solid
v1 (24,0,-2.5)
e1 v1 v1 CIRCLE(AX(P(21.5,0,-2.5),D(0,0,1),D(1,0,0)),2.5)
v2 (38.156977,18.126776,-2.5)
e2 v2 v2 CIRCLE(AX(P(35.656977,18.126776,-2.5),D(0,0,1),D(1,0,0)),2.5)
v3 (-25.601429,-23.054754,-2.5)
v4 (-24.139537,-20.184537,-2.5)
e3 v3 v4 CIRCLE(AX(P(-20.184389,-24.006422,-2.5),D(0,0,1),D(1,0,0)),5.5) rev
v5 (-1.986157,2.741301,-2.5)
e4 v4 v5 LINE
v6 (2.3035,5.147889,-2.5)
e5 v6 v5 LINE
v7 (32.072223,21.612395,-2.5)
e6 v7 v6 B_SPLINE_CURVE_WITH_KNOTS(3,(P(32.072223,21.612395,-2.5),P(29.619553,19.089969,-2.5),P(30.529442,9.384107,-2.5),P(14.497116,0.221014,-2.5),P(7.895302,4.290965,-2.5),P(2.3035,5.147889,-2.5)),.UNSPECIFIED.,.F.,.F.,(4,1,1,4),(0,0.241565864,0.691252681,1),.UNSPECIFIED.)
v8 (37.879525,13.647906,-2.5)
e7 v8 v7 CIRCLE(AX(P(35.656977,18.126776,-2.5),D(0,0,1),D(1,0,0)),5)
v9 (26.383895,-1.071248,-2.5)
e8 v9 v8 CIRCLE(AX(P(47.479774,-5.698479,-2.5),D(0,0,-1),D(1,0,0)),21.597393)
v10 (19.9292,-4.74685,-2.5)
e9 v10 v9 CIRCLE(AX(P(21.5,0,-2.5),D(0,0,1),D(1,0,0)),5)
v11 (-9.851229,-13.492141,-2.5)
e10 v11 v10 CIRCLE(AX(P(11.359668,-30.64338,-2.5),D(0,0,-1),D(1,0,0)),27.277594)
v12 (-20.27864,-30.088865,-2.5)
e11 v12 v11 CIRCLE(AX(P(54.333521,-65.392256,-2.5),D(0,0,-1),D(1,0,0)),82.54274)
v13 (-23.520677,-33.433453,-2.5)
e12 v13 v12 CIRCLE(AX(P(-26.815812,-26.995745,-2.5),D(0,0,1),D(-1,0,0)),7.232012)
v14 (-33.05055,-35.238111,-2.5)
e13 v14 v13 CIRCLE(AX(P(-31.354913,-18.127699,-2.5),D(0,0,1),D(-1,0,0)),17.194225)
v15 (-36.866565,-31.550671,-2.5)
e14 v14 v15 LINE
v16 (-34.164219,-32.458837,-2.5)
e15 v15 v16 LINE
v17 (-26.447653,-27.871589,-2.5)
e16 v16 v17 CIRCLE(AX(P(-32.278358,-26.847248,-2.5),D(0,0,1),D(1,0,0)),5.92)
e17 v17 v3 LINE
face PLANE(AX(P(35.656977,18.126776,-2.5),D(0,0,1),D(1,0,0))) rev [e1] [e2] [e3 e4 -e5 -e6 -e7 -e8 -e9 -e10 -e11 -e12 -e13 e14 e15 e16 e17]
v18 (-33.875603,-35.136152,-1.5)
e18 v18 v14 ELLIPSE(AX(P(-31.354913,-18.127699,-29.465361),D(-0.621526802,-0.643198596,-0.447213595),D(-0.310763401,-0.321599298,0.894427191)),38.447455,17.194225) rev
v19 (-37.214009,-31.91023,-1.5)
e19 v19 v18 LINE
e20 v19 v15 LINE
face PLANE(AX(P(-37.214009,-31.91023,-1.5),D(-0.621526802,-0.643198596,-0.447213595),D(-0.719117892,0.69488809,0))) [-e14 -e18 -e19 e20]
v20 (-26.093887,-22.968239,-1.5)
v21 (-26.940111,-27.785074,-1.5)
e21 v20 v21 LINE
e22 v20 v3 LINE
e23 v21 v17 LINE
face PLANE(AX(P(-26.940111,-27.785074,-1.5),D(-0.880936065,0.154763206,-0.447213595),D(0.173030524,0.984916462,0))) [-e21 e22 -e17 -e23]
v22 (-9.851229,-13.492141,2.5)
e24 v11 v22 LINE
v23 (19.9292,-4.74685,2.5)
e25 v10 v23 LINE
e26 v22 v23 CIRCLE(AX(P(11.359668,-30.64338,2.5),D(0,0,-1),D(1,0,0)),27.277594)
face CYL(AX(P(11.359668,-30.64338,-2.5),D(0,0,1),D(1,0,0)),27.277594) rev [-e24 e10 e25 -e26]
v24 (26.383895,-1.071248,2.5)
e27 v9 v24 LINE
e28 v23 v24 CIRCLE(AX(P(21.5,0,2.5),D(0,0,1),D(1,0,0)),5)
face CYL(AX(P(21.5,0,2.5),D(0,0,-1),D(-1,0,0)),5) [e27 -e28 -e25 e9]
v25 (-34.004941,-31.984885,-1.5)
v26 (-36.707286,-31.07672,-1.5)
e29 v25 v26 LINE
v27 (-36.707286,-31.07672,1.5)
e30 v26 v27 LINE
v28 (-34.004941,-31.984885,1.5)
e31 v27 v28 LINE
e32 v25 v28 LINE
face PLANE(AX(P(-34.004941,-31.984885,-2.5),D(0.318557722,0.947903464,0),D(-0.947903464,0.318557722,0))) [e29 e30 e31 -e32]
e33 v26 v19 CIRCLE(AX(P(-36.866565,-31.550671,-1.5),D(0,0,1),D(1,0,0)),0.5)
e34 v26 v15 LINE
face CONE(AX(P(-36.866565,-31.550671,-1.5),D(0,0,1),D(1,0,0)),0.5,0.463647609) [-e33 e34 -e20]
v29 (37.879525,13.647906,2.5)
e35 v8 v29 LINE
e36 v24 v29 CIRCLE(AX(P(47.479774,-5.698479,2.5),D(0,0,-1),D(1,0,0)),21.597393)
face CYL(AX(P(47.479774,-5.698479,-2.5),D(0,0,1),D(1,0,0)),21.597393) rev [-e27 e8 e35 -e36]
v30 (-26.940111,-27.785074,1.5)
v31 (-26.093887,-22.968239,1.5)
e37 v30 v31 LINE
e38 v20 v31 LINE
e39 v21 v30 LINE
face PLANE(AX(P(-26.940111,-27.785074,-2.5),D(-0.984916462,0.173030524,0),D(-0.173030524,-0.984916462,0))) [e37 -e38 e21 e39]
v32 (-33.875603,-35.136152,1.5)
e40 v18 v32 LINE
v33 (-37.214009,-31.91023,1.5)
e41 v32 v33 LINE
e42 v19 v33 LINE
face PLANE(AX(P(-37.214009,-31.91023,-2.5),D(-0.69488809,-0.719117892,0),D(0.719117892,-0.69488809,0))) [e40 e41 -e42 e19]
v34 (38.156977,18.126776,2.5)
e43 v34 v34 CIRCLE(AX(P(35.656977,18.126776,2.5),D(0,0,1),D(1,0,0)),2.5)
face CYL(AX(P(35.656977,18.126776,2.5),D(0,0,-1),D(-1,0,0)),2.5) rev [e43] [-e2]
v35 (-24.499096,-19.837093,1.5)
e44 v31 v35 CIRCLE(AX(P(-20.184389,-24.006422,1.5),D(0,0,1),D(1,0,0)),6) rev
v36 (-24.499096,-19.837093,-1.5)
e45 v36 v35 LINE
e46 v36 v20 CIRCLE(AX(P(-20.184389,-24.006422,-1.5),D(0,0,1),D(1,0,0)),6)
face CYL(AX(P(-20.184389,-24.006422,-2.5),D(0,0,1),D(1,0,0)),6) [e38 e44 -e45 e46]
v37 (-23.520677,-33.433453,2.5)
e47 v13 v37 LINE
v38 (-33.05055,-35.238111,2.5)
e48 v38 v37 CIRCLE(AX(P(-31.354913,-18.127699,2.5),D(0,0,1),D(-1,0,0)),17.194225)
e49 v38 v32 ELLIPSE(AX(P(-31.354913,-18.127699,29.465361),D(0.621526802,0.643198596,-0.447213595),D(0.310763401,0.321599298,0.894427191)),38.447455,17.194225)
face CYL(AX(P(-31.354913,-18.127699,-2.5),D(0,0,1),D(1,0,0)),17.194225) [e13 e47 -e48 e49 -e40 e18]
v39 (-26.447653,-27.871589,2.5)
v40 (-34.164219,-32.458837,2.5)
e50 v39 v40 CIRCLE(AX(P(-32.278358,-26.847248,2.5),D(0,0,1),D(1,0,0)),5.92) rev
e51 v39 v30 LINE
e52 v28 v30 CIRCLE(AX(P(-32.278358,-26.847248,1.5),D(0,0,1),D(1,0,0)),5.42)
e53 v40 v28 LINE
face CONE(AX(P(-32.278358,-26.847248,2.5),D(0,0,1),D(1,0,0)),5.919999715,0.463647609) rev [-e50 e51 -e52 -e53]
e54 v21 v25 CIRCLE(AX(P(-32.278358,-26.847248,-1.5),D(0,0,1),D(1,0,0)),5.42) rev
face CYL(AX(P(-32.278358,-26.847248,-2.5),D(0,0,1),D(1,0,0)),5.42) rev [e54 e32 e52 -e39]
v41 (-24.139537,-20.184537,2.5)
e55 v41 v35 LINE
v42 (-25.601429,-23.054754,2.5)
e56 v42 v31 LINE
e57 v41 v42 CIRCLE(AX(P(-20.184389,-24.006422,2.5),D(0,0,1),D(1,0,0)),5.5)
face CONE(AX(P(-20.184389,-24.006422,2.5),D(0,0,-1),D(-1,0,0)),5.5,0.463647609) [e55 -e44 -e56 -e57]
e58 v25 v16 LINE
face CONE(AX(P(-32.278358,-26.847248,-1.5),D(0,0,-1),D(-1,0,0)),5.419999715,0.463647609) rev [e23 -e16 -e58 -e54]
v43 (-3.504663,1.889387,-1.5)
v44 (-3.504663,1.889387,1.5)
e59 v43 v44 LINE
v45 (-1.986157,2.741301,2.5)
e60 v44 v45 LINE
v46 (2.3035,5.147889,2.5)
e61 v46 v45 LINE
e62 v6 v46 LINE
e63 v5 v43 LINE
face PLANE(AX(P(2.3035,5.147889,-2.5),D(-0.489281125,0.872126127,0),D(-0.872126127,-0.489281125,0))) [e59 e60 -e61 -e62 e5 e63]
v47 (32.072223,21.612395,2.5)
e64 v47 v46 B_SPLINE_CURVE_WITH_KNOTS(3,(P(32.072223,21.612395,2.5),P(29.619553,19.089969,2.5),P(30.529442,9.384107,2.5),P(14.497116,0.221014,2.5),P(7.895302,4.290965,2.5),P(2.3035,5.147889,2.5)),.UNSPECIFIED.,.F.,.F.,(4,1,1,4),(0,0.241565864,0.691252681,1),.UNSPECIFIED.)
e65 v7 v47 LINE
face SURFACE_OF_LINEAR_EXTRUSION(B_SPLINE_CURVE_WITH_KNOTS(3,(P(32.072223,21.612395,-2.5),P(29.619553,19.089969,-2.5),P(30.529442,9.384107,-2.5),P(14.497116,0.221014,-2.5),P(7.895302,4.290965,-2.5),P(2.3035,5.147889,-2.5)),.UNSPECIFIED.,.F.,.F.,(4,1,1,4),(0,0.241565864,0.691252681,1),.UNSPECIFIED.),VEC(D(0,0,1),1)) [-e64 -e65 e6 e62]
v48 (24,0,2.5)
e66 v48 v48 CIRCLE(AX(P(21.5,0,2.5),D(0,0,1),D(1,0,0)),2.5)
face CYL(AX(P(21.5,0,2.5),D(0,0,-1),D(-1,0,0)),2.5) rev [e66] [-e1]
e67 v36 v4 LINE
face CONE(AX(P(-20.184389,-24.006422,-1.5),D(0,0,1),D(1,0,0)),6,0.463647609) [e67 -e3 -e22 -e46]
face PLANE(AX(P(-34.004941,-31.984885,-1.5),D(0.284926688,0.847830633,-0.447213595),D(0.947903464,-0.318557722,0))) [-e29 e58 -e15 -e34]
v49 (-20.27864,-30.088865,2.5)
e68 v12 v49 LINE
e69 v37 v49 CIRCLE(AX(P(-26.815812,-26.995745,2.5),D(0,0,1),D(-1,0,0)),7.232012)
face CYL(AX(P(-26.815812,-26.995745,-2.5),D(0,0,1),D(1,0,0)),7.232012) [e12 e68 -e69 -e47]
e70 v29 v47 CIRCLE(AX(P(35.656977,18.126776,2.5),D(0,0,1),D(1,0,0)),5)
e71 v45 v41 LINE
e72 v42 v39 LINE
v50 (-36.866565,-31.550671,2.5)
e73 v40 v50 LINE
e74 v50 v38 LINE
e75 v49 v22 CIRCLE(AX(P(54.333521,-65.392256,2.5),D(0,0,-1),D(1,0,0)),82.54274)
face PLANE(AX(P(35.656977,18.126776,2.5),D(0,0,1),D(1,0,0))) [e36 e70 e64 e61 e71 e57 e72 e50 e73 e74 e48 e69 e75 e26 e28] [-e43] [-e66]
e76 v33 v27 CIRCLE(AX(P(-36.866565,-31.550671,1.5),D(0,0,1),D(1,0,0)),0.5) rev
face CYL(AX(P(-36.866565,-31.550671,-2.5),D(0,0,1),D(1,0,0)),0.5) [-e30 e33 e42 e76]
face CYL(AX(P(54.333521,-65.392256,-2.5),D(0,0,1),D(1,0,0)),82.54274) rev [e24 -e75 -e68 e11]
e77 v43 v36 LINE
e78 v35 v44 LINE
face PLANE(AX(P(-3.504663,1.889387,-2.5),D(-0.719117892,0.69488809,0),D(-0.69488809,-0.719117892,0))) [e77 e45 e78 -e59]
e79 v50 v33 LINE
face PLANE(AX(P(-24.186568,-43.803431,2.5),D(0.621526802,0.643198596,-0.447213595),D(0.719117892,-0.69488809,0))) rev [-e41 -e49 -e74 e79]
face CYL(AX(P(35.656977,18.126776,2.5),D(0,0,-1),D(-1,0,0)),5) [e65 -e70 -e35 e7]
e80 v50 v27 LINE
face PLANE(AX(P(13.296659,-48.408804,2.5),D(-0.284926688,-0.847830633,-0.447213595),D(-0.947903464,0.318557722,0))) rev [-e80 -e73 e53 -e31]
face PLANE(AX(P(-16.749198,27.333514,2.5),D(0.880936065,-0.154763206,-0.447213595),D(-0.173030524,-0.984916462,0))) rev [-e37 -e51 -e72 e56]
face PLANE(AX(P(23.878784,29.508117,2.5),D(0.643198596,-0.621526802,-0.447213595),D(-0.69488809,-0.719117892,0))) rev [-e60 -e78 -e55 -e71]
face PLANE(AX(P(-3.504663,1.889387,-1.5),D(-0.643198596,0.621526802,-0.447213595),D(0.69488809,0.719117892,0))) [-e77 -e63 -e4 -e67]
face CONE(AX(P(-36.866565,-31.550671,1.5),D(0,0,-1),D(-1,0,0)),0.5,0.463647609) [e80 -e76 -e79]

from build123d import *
from OCP.BRepFilletAPI import BRepFilletAPI_MakeChamfer

# Parameters (mm, degrees)
SKETCH_1_R          = 2.5
EXTRUDE_1_DEPTH     = 2.5
SKETCH_2_OUTSIDE_W  = 116.118
SKETCH_2_OUTSIDE_H  = 88.955
CUT_EXTRUDE_1_DEPTH = 5
CHAMFER_1_SIZE      = 1
CHAMFER_1_SIZE_2    = 0.5
CHAMFER_2_SIZE      = 0.5
CHAMFER_2_SIZE_2    = 1


with BuildPart() as part:
    # 草圖1 → 填料-伸長1 (new, symmetric)
    with BuildSketch(Plane.XY):
        with BuildLine():
            Line((33.210571119, 22.487406669), (9.212656684, 9.024071248))
            Line((9.212656684, 9.024071248), (9.212656684, 13.217540535))
            Line((9.212656684, 13.217540535), (-51.018500429, 13.217540535))
            Line((-51.018500429, 13.217540535), (-51.018500429, -41.386180002))
            Line((-51.018500429, -41.386180002), (9.212656684, -41.386180002))
            Line((9.212656684, -41.386180002), (9.212656684, -5))
            Line((9.212656684, -5), (21.5, -5))
            ThreePointArc((21.5, -5), (23.692257033, -4.493774483), (25.440603486, -3.07760364))
            Line((25.440603486, -3.07760364), (39.59758023, 15.049172396))
            ThreePointArc((39.59758023, 15.049172396), (39.450390654, 21.384077206), (33.210571119, 22.487406669))
        make_face()
        with Locations((21.5, 0)):
            Circle(SKETCH_1_R, mode=Mode.SUBTRACT)
        with Locations((35.656976744, 18.126776036)):
            Circle(SKETCH_1_R, mode=Mode.SUBTRACT)
    extrude(amount=EXTRUDE_1_DEPTH, both=True)

    # 草圖2 outside → 除料-伸長1 (cut)
    with BuildSketch(Plane.XY.offset(2.5)):
        with Locations((-5.181, -9.1295)):
            Rectangle(SKETCH_2_OUTSIDE_W, SKETCH_2_OUTSIDE_H)
        with BuildLine():
            Line((-3.504662874, 1.889387135), (-24.499095951, -19.837093245))
            ThreePointArc((-24.499095951, -19.837093245), (-25.530846828, -21.28330144), (-26.093887373, -22.968238639))
            Line((-26.093887373, -22.968238639), (-26.940110928, -27.785073774))
            ThreePointArc((-26.940110928, -27.785073774), (-29.508767127, -31.506192899), (-34.004940633, -31.984884889))
            Line((-34.004940633, -31.984884889), (-36.707285896, -31.076719678))
            ThreePointArc((-36.707285896, -31.076719678), (-37.293807717, -31.290934133), (-37.214008802, -31.910230356))
            Line((-37.214008802, -31.910230356), (-33.875603228, -35.136152419))
            ThreePointArc((-33.875603228, -35.136152419), (-28.5650672, -35.094081272), (-23.520676583, -33.433453021))
            ThreePointArc((-23.520676583, -33.433453021), (-21.623015625, -32.029319154), (-20.278640263, -30.088864592))
            ThreePointArc((-20.278640263, -30.088864592), (-15.559314436, -21.479893225), (-9.851228903, -13.492141112))
            ThreePointArc((-9.851228903, -13.492141112), (3.673898096, -4.470950273), (19.929199503, -4.746850092))
            ThreePointArc((19.929199503, -4.746850092), (23.974199209, -4.344920975), (26.383894798, -1.071247685))
            ThreePointArc((26.383894798, -1.071247685), (30.458421446, 7.595163953), (37.879524863, 13.647905658))
            ThreePointArc((37.879524863, 13.647905658), (39.697047859, 21.072590929), (32.072223107, 21.612395258))
            add(Edge.make_bspline(
                [(32.072223107, 21.612395258), (29.619553058, 19.089968877), (30.529442098, 9.384107467), (14.497116464, 0.221014353), (7.895302384, 4.290965143), (2.303499892, 5.147888773)],
                knots=[0, 0, 0, 0, 0.241565864, 0.691252681, 1, 1, 1, 1], degree=3))
            Line((2.303499892, 5.147888773), (-3.504662874, 1.889387135))
        make_face(mode=Mode.SUBTRACT)
    extrude(amount=-CUT_EXTRUDE_1_DEPTH, mode=Mode.SUBTRACT)

    # 導角1
    chamfer_1_edges_1 = [part.edges().sort_by_distance(p)[0] for p in [
        (-35.544806015, -33.523191388, 2.5),
    ]]
    chamfer_1_side_1 = [part.faces().sort_by_distance(p)[0] for p in [
        (-35.544806015, -33.523191388, 2.49),
    ]]
    chamfer_1_edges_2 = [part.edges().sort_by_distance(p)[0] for p in [
        (-37.293807717, -31.290934133, 2.5),
    ]]
    chamfer_1_side_2 = [part.faces().sort_by_distance(p)[0] for p in [
        (-37.293807717, -31.290934133, 2.49),
    ]]
    chamfer_1_edges_3 = [part.edges().sort_by_distance(p)[0] for p in [
        (-35.356113265, -31.530802283, 2.5),
    ]]
    chamfer_1_side_3 = [part.faces().sort_by_distance(p)[0] for p in [
        (-35.356113265, -31.530802283, 2.49),
    ]]
    chamfer_1_edges_4 = [part.edges().sort_by_distance(p)[0] for p in [
        (-29.508767127, -31.506192899, 2.5),
    ]]
    chamfer_1_side_4 = [part.faces().sort_by_distance(p)[0] for p in [
        (-29.508767127, -31.506192899, 2.49),
    ]]
    chamfer_1_edges_5 = [part.edges().sort_by_distance(p)[0] for p in [
        (-26.516999151, -25.376656206, 2.5),
    ]]
    chamfer_1_side_5 = [part.faces().sort_by_distance(p)[0] for p in [
        (-26.516999151, -25.376656206, 2.49),
    ]]
    chamfer_1_edges_6 = [part.edges().sort_by_distance(p)[0] for p in [
        (-25.530846828, -21.28330144, 2.5),
    ]]
    chamfer_1_side_6 = [part.faces().sort_by_distance(p)[0] for p in [
        (-25.530846828, -21.28330144, 2.49),
    ]]
    chamfer_1_edges_7 = [part.edges().sort_by_distance(p)[0] for p in [
        (-14.001879412, -8.973853055, 2.5),
    ]]
    chamfer_1_side_7 = [part.faces().sort_by_distance(p)[0] for p in [
        (-14.001879412, -8.973853055, 2.49),
    ]]
    chamfer_1 = BRepFilletAPI_MakeChamfer(part.part.solid().wrapped)
    for e in chamfer_1_edges_1:
        chamfer_1.Add(CHAMFER_1_SIZE - 0.0001, CHAMFER_1_SIZE_2 - 0.0001, e.wrapped, chamfer_1_side_1[0].wrapped)
    for e in chamfer_1_edges_2:
        chamfer_1.Add(CHAMFER_1_SIZE - 0.0001, CHAMFER_1_SIZE_2 - 0.0001, e.wrapped, chamfer_1_side_2[0].wrapped)
    for e in chamfer_1_edges_3:
        chamfer_1.Add(CHAMFER_1_SIZE - 0.0001, CHAMFER_1_SIZE_2 - 0.0001, e.wrapped, chamfer_1_side_3[0].wrapped)
    for e in chamfer_1_edges_4:
        chamfer_1.Add(CHAMFER_1_SIZE - 0.0001, CHAMFER_1_SIZE_2 - 0.0001, e.wrapped, chamfer_1_side_4[0].wrapped)
    for e in chamfer_1_edges_5:
        chamfer_1.Add(CHAMFER_1_SIZE - 0.0001, CHAMFER_1_SIZE_2 - 0.0001, e.wrapped, chamfer_1_side_5[0].wrapped)
    for e in chamfer_1_edges_6:
        chamfer_1.Add(CHAMFER_1_SIZE - 0.0001, CHAMFER_1_SIZE_2 - 0.0001, e.wrapped, chamfer_1_side_6[0].wrapped)
    for e in chamfer_1_edges_7:
        chamfer_1.Add(CHAMFER_1_SIZE - 0.0001, CHAMFER_1_SIZE_2 - 0.0001, e.wrapped, chamfer_1_side_7[0].wrapped)
    add(Compound.cast(chamfer_1.Shape()), mode=Mode.REPLACE)  # a hair under: the kernel refuses the full size

    # 導角2
    chamfer_2_edges_1 = [part.edges().sort_by_distance(p)[0] for p in [
        (-14.001879412, -8.973853055, -2.5),
    ]]
    chamfer_2_side_1 = [part.faces().sort_by_distance(p)[0] for p in [
        (-13.994688233, -8.980801936, -2.5),
    ]]
    chamfer_2_edges_2 = [part.edges().sort_by_distance(p)[0] for p in [
        (-25.530846828, -21.28330144, -2.5),
    ]]
    chamfer_2_side_2 = [part.faces().sort_by_distance(p)[0] for p in [
        (-25.521936065, -21.287839974, -2.5),
    ]]
    chamfer_2_edges_3 = [part.edges().sort_by_distance(p)[0] for p in [
        (-26.516999151, -25.376656206, -2.5),
    ]]
    chamfer_2_side_3 = [part.faces().sort_by_distance(p)[0] for p in [
        (-26.507149986, -25.378386512, -2.5),
    ]]
    chamfer_2_edges_4 = [part.edges().sort_by_distance(p)[0] for p in [
        (-29.508767127, -31.506192899, -2.5),
    ]]
    chamfer_2_side_4 = [part.faces().sort_by_distance(p)[0] for p in [
        (-29.503657181, -31.514788738, -2.5),
    ]]
    chamfer_2_edges_5 = [part.edges().sort_by_distance(p)[0] for p in [
        (-35.356113265, -31.530802283, -2.5),
    ]]
    chamfer_2_side_5 = [part.faces().sort_by_distance(p)[0] for p in [
        (-35.359298842, -31.540281318, -2.5),
    ]]
    chamfer_2_edges_6 = [part.edges().sort_by_distance(p)[0] for p in [
        (-37.293807717, -31.290934133, -2.5),
    ]]
    chamfer_2_side_6 = [part.faces().sort_by_distance(p)[0] for p in [
        (-37.285262858, -31.296128878, -2.5),
    ]]
    chamfer_2_edges_7 = [part.edges().sort_by_distance(p)[0] for p in [
        (-35.544806015, -33.523191388, -2.5),
    ]]
    chamfer_2_side_7 = [part.faces().sort_by_distance(p)[0] for p in [
        (-35.544806015, -33.523191388, -2.49),
    ]]
    chamfer_2 = BRepFilletAPI_MakeChamfer(part.part.solid().wrapped)
    for e in chamfer_2_edges_1:
        chamfer_2.Add(CHAMFER_2_SIZE - 0.0001, CHAMFER_2_SIZE_2 - 0.0001, e.wrapped, chamfer_2_side_1[0].wrapped)
    for e in chamfer_2_edges_2:
        chamfer_2.Add(CHAMFER_2_SIZE - 0.0001, CHAMFER_2_SIZE_2 - 0.0001, e.wrapped, chamfer_2_side_2[0].wrapped)
    for e in chamfer_2_edges_3:
        chamfer_2.Add(CHAMFER_2_SIZE - 0.0001, CHAMFER_2_SIZE_2 - 0.0001, e.wrapped, chamfer_2_side_3[0].wrapped)
    for e in chamfer_2_edges_4:
        chamfer_2.Add(CHAMFER_2_SIZE - 0.0001, CHAMFER_2_SIZE_2 - 0.0001, e.wrapped, chamfer_2_side_4[0].wrapped)
    for e in chamfer_2_edges_5:
        chamfer_2.Add(CHAMFER_2_SIZE - 0.0001, CHAMFER_2_SIZE_2 - 0.0001, e.wrapped, chamfer_2_side_5[0].wrapped)
    for e in chamfer_2_edges_6:
        chamfer_2.Add(CHAMFER_2_SIZE - 0.0001, CHAMFER_2_SIZE_2 - 0.0001, e.wrapped, chamfer_2_side_6[0].wrapped)
    for e in chamfer_2_edges_7:
        chamfer_2.Add(CHAMFER_2_SIZE_2 - 0.0001, CHAMFER_2_SIZE - 0.0001, e.wrapped, chamfer_2_side_7[0].wrapped)
    add(Compound.cast(chamfer_2.Shape()), mode=Mode.REPLACE)  # a hair under: the kernel refuses the full size


solid = part.part
